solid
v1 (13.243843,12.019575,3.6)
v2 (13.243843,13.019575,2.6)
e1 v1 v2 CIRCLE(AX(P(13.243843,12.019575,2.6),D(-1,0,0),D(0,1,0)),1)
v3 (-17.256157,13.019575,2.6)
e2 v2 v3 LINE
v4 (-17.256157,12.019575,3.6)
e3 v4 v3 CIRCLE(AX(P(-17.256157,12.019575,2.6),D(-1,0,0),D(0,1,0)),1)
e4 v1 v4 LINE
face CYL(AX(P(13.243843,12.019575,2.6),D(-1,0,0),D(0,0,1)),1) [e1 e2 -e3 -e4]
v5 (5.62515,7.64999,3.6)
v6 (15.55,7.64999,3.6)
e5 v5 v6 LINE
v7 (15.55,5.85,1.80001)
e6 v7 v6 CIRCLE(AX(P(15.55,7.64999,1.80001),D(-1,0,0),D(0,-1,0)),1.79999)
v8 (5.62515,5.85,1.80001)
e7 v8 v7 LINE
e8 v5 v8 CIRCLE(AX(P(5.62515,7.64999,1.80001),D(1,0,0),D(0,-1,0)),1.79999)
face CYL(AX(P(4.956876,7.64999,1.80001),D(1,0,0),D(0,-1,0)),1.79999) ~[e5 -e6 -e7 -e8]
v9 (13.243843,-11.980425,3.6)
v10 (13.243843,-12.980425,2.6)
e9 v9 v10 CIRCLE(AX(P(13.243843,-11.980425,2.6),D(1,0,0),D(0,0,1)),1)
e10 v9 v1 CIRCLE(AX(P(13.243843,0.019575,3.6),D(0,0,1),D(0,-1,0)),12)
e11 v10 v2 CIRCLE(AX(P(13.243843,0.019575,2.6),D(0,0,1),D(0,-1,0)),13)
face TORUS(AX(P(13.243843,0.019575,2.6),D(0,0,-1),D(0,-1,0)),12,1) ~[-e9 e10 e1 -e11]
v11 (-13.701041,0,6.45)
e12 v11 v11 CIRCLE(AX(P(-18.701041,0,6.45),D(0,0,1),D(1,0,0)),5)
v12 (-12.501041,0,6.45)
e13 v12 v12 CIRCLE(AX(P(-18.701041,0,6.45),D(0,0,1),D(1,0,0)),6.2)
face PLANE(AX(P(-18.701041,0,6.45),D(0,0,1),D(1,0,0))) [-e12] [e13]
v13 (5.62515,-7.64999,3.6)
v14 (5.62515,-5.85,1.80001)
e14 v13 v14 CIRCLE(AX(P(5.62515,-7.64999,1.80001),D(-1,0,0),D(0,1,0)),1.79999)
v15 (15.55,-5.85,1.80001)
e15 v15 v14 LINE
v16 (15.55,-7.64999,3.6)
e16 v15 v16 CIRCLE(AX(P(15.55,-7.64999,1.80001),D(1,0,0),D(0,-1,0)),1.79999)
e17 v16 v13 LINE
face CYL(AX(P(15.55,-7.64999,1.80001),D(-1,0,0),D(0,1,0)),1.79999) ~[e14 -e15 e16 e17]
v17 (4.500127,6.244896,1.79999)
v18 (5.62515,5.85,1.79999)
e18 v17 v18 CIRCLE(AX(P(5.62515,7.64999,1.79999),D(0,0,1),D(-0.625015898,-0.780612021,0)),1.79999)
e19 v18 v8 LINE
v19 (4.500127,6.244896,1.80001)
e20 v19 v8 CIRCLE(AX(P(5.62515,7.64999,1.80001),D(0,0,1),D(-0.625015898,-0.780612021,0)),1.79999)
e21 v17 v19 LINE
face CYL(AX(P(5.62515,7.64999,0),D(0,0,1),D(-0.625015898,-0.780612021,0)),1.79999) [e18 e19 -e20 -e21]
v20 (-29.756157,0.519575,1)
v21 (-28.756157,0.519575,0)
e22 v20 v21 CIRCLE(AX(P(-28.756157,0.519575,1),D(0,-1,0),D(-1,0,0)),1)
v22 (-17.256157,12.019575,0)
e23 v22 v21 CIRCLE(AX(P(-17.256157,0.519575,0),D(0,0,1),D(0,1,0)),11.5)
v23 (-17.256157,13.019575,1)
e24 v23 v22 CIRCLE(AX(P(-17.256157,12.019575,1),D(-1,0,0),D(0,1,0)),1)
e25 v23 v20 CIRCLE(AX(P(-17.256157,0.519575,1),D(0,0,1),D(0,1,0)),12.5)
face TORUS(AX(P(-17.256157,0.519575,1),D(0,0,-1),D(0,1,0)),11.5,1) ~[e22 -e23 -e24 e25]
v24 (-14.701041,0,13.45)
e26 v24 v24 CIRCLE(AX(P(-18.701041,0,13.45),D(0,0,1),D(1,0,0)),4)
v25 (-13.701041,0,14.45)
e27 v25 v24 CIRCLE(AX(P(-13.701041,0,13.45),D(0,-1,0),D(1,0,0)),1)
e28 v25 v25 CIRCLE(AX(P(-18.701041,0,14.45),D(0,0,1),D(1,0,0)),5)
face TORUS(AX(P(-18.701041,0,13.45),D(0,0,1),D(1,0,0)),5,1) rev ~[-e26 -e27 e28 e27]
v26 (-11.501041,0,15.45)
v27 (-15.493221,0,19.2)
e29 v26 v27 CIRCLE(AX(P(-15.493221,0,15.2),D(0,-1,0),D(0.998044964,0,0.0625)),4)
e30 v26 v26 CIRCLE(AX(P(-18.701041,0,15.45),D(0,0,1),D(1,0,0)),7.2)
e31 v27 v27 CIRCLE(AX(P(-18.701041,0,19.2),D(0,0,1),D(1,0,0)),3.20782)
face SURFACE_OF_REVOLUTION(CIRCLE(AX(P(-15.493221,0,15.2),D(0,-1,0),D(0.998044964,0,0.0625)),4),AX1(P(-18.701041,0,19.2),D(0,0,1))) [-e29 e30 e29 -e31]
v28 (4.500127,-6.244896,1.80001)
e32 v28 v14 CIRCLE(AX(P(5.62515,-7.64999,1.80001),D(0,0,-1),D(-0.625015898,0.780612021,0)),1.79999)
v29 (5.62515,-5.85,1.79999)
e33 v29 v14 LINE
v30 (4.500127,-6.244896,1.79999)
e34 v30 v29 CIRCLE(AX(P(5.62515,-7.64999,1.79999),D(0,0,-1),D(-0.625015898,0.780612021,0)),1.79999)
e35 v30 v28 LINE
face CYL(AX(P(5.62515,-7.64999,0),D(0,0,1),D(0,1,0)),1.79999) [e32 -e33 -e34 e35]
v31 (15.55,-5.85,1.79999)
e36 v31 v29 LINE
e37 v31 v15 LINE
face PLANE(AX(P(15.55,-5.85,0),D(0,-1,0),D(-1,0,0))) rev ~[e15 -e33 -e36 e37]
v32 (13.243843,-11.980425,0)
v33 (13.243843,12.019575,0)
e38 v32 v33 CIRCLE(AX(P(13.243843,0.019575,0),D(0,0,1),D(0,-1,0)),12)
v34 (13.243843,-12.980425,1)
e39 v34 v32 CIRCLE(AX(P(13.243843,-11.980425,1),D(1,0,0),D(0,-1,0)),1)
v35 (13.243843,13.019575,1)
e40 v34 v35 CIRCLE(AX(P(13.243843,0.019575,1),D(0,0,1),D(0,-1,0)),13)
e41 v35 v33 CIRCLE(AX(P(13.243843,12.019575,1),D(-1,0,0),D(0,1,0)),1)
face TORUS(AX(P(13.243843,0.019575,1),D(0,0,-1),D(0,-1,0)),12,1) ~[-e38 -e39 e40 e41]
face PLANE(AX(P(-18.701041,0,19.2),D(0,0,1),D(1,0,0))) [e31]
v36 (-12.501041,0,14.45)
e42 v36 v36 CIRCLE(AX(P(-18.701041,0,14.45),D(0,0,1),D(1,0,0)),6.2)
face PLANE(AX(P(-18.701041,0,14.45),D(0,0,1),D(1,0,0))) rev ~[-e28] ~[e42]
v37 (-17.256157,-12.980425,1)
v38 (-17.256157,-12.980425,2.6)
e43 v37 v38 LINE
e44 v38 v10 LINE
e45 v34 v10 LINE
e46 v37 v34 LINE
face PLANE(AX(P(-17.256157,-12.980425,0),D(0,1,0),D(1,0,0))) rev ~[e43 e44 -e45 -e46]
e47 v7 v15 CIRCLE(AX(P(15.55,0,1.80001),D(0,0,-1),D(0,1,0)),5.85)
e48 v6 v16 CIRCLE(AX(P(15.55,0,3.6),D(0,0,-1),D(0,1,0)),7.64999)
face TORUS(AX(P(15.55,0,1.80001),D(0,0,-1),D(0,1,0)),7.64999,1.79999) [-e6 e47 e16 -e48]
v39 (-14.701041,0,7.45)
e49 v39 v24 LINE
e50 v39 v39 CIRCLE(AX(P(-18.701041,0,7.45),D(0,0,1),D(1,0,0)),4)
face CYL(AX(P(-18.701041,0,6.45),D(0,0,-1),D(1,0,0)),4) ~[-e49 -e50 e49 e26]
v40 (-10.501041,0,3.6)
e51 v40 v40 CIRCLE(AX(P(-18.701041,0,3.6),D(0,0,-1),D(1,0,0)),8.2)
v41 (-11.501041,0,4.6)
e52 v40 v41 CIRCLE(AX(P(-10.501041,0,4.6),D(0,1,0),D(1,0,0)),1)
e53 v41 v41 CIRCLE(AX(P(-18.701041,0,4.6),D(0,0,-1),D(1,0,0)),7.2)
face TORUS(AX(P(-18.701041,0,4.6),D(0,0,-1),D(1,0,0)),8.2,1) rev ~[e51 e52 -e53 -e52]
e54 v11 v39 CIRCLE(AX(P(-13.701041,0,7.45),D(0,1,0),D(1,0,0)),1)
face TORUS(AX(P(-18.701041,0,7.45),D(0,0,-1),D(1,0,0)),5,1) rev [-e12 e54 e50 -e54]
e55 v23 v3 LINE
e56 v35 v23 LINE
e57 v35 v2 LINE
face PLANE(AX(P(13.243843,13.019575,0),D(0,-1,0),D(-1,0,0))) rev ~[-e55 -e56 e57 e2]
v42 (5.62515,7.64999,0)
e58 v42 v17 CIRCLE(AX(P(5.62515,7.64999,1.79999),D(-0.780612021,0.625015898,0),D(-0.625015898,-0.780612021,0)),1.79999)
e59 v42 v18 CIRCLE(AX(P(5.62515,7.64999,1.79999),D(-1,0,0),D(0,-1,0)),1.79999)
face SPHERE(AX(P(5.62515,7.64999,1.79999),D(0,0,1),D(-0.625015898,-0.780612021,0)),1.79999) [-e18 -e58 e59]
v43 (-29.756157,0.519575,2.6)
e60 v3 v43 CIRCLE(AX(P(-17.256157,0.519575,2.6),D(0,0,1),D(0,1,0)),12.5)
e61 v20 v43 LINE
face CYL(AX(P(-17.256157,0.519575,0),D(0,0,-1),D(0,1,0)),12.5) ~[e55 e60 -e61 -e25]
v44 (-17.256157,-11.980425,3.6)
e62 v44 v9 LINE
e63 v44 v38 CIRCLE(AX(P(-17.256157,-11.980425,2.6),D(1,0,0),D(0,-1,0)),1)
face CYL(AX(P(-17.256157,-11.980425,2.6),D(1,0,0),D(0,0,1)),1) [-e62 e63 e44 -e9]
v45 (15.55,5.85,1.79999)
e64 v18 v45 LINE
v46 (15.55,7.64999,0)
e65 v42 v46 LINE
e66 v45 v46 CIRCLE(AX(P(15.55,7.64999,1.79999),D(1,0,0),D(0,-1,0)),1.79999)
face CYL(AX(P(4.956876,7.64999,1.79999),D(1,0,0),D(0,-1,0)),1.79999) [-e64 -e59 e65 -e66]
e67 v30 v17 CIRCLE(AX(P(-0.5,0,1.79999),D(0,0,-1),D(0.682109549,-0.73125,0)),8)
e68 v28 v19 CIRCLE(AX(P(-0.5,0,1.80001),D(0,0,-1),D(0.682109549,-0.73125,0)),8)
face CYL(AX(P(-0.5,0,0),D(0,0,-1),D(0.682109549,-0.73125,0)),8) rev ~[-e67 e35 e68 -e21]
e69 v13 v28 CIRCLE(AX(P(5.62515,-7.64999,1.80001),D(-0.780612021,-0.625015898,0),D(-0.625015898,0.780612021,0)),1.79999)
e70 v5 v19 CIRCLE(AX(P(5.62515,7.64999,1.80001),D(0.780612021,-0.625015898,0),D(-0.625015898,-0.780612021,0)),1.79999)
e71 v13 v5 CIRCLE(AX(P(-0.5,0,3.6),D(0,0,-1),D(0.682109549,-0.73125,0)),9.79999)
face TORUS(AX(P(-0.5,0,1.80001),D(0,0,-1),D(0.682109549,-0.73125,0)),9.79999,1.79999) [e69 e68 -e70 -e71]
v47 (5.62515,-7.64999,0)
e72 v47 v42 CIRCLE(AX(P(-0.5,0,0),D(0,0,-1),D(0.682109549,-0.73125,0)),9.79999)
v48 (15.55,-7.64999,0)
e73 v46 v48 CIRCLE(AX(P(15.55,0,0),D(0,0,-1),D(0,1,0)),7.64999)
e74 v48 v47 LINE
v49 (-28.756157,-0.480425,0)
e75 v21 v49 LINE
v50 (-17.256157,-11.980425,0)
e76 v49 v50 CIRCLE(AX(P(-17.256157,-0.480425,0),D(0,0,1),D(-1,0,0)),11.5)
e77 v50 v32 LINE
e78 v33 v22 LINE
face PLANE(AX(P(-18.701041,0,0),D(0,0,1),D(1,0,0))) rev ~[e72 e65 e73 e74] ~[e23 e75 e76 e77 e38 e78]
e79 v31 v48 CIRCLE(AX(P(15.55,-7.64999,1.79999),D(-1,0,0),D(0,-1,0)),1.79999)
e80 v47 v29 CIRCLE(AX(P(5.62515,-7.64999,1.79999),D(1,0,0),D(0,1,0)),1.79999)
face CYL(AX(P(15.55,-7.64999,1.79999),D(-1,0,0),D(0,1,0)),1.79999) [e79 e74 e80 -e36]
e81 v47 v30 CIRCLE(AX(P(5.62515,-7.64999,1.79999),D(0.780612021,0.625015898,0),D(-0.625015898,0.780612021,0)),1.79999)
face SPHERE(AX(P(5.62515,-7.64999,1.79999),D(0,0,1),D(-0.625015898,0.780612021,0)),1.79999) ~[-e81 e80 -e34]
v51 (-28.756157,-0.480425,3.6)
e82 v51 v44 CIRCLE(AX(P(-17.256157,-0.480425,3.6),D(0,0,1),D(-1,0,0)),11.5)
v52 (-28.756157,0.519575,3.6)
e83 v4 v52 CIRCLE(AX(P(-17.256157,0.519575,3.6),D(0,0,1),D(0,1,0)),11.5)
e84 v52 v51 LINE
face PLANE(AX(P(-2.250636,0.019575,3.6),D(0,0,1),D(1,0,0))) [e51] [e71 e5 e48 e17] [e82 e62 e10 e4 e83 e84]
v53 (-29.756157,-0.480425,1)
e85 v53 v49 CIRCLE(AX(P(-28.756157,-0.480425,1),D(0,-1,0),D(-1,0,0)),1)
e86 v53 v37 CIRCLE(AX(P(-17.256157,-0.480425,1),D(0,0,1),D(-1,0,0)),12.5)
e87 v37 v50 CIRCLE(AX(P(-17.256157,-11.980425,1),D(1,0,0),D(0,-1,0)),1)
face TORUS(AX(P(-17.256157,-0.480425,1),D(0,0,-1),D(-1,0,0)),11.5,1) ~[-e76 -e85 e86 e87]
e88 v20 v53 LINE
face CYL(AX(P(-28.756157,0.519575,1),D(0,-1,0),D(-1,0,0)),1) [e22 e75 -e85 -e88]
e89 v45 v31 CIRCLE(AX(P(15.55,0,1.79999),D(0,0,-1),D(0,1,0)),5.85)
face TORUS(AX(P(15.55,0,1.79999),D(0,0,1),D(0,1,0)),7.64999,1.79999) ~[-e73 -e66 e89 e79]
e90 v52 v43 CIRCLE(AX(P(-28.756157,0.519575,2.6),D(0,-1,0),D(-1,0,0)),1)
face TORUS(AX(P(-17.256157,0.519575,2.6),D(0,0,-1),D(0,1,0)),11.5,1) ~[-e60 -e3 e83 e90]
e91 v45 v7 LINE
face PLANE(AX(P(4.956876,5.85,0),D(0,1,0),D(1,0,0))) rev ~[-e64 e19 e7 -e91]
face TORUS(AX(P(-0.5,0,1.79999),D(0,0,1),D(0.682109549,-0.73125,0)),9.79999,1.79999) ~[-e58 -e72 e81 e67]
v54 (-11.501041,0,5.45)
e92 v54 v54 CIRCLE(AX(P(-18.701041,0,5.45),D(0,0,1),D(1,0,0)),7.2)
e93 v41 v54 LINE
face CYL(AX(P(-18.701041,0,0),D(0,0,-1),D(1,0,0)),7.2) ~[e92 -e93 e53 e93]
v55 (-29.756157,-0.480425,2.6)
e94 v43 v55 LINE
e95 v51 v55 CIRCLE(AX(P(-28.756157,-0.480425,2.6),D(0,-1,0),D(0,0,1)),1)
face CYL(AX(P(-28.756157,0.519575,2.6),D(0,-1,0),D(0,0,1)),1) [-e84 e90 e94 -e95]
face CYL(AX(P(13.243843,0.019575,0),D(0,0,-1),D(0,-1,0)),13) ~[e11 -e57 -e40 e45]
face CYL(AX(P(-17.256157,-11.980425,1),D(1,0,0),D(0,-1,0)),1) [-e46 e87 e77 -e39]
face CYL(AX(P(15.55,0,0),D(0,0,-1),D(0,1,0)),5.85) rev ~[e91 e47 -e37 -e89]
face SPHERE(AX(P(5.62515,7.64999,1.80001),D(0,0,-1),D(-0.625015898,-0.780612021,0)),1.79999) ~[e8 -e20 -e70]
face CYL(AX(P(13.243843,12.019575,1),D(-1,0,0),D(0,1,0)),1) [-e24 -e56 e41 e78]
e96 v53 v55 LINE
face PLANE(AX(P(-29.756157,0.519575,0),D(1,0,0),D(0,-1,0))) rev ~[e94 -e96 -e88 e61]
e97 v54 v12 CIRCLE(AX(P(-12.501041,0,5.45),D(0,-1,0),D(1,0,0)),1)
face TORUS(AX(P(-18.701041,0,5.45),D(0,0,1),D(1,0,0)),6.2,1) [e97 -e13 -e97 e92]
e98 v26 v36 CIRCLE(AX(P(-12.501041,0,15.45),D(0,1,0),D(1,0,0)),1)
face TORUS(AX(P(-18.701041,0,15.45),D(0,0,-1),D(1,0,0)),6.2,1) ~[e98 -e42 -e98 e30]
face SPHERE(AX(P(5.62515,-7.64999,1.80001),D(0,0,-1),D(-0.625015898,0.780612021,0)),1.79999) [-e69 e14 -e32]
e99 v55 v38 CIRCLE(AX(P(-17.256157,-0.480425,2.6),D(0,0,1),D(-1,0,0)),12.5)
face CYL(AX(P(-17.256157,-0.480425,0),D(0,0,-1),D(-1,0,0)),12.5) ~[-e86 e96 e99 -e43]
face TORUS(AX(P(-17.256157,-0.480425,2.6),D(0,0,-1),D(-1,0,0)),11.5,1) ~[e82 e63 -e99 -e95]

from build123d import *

# Parameters (mm, degrees)
F0_R     = 7.2
F1_DEPTH = 3.6
F2_R     = 1.79999
F3_R     = 7.2
F4_DEPTH = 6.45
F5_R     = 4
F6_DEPTH = 8
F8_R     = 1
F7_R     = 7.2
F7_R_2   = 4
F9_DEPTH = 4.75
F10_R    = 1
F12_R    = 1


# Not quite as in the source:
# - a fillet or chamfer that OpenCascade refuses, or shapes differently, is made with other operations: its cross-section is extruded or revolved along the edge and cut away or added
# - a fillet or chamfer is up to 0.001 mm smaller than in the source, because OpenCascade refuses the exact size


with BuildPart() as f1:
    # F0 (on Top) → F1 (new body)
    with BuildSketch(Plane.XY):
        with BuildLine():
            ThreePointArc((-17.2561568693, 13.0195750748), (-26.0949916342, 9.3584098397), (-29.7561568693, 0.5195750748))
            Line((-29.7561568693, 0.5195750748), (-29.7561568693, 0))
            Line((-29.7561568693, 0), (-29.7561568693, -0.4804249252))
            ThreePointArc((-29.7561568693, -0.4804249252), (-26.0949916342, -9.31925969), (-17.2561568693, -12.9804249252))
            Line((-17.2561568693, -12.9804249252), (13.2438431307, -12.9804249252))
            ThreePointArc((13.2438431307, -12.9804249252), (22.4362312861, -9.1728130806), (26.2438431307, 0.0195750748))
            ThreePointArc((26.2438431307, 0.0195750748), (22.4362312861, 9.2119632303), (13.2438431307, 13.0195750748))
            Line((13.2438431307, 13.0195750748), (-17.2561568693, 13.0195750748))
        make_face()
        with Locations((-18.7568739057, 0)):
            Circle(F0_R, mode=Mode.SUBTRACT)
        with BuildLine():
            ThreePointArc((4.956876454, -5.85), (-8.4999999419, 0), (4.956876454, 5.85))
            Line((4.956876454, 5.85), (5.4, 5.85))
            Line((5.4, 5.85), (15.5500000581, 5.85))
            ThreePointArc((15.5500000581, 5.85), (21.4000000581, 0), (15.5500000581, -5.85))
            Line((15.5500000581, -5.85), (5.4, -5.85))
            Line((5.4, -5.85), (4.956876454, -5.85))
        make_face(mode=Mode.SUBTRACT)
        with Locations((-18.7568739057, 0)):
            Circle(F0_R)
    extrude(amount=F1_DEPTH)

    # F2 (radius 1.8 in the source; OpenCascade refuses exactly that, so slightly less here)
    f2_edges = [f1.edges().sort_by_distance(p)[0] for p in [
        (4.956876, -5.85, 1.8),
        (4.956876, 5.85, 1.8),
        (-8.5, 0, 0),
        (-8.5, 0, 3.6),
        (15.55, 5.85, 1.8),
        (10.253438, 5.85, 0),
        (10.253438, 5.85, 3.6),
        (15.55, -5.85, 1.8),
        (21.4, 0, 0),
        (21.4, 0, 3.6),
        (10.253438, -5.85, 0),
        (10.253438, -5.85, 3.6),
    ]]
    fillet(f2_edges, radius=F2_R)

    # F3 (on Top) → F4 (join)
    with BuildSketch(Plane.XY):
        with Locations((-18.7010411173, 0)):
            Circle(F3_R)
    extrude(amount=F4_DEPTH)

    # F5 (on face) → F6 (join)
    with BuildSketch(Plane.XY.offset(6.45)):
        with Locations((-18.7010411173, 0)):
            Circle(F5_R)
    extrude(amount=F6_DEPTH)

    # F8
    f8_edges = [f1.edges().sort_by_distance(p)[0] for p in [
        (-25.901041, 0, 6.45),
        (-22.701041, 0, 6.45),
        (-25.901041, 0, 3.6),
        (-11.501041, 0, 5.025),
    ]]
    fillet(f8_edges, radius=F8_R)

    # F7 (on face) → F9 (join)
    with BuildSketch(Plane.XY.offset(14.45)):
        with Locations((-18.7010411173, 0)):
            Circle(F7_R)
        with Locations((-18.7010411173, 0)):
            Circle(F7_R_2, mode=Mode.SUBTRACT)
        with Locations((-18.7010411173, 0)):
            Circle(F7_R_2)
    extrude(amount=F9_DEPTH)

    # F10
    f10_edges = [f1.edges().sort_by_distance(p)[0] for p in [
        (-25.901041, 0, 14.45),
        (-22.701041, 0, 14.45),
        (-14.701041, 0, 10.95),
        (-22.701041, 0, 7.45),
    ]]
    fillet(f10_edges, radius=F10_R)

    # F11: fillet of radius 4 on 3 edges, made by hand

    # F11_s1 → F11_t2 (revolve, cut)
    with BuildSketch(Plane.XZ):
        with BuildLine():
            ThreePointArc((-11.5010411173, 15.45), (-12.7546081855, 18.1154759474), (-15.493220973, 19.2))
            Line((-15.493220973, 19.2), (-15.493220973, 19.28))
            Line((-15.493220973, 19.28), (-11.5010411173, 19.28))
            Line((-11.5010411173, 19.28), (-11.4210411173, 19.2))
            ThreePointArc((-11.4210411173, 19.2), (-11.4210411173, 17.325), (-11.4211975202, 15.455))
            Line((-11.4211975202, 15.455), (-11.5010411173, 15.45))
        make_face()
    revolve(axis=Axis((-18.7010411173, 0, 19.2), (0, 0, 1)), mode=Mode.SUBTRACT)

    # F12
    f12_edges = [f1.edges().sort_by_distance(p)[0] for p in [
        (-26.901041, 0, 3.6),
        (-26.094992, 9.35841, 3.6),
        (-2.006157, 13.019575, 3.6),
        (-29.756157, 0.019575, 3.6),
        (26.243843, 0.019575, 3.6),
        (-26.094992, -9.31926, 3.6),
        (-2.006157, -12.980425, 3.6),
        (-10.29999, 0, 3.6),
        (10.587575, -7.64999, 3.6),
        (10.587575, 7.64999, 3.6),
        (23.19999, 0, 3.6),
        (-29.756157, -0.480425, 1.8),
        (-17.256157, -12.980425, 1.8),
        (-26.094992, -9.31926, 0),
        (13.243843, -12.980425, 1.8),
        (-2.006157, -12.980425, 0),
        (13.243843, 13.019575, 1.8),
        (26.243843, 0.019575, 0),
        (-17.256157, 13.019575, 1.8),
        (-2.006157, 13.019575, 0),
        (-29.756157, 0.519575, 1.8),
        (-26.094992, 9.35841, 0),
        (-29.756157, 0.019575, 0),
    ]]
    fillet(f12_edges, radius=F12_R)


solid = f1.part
